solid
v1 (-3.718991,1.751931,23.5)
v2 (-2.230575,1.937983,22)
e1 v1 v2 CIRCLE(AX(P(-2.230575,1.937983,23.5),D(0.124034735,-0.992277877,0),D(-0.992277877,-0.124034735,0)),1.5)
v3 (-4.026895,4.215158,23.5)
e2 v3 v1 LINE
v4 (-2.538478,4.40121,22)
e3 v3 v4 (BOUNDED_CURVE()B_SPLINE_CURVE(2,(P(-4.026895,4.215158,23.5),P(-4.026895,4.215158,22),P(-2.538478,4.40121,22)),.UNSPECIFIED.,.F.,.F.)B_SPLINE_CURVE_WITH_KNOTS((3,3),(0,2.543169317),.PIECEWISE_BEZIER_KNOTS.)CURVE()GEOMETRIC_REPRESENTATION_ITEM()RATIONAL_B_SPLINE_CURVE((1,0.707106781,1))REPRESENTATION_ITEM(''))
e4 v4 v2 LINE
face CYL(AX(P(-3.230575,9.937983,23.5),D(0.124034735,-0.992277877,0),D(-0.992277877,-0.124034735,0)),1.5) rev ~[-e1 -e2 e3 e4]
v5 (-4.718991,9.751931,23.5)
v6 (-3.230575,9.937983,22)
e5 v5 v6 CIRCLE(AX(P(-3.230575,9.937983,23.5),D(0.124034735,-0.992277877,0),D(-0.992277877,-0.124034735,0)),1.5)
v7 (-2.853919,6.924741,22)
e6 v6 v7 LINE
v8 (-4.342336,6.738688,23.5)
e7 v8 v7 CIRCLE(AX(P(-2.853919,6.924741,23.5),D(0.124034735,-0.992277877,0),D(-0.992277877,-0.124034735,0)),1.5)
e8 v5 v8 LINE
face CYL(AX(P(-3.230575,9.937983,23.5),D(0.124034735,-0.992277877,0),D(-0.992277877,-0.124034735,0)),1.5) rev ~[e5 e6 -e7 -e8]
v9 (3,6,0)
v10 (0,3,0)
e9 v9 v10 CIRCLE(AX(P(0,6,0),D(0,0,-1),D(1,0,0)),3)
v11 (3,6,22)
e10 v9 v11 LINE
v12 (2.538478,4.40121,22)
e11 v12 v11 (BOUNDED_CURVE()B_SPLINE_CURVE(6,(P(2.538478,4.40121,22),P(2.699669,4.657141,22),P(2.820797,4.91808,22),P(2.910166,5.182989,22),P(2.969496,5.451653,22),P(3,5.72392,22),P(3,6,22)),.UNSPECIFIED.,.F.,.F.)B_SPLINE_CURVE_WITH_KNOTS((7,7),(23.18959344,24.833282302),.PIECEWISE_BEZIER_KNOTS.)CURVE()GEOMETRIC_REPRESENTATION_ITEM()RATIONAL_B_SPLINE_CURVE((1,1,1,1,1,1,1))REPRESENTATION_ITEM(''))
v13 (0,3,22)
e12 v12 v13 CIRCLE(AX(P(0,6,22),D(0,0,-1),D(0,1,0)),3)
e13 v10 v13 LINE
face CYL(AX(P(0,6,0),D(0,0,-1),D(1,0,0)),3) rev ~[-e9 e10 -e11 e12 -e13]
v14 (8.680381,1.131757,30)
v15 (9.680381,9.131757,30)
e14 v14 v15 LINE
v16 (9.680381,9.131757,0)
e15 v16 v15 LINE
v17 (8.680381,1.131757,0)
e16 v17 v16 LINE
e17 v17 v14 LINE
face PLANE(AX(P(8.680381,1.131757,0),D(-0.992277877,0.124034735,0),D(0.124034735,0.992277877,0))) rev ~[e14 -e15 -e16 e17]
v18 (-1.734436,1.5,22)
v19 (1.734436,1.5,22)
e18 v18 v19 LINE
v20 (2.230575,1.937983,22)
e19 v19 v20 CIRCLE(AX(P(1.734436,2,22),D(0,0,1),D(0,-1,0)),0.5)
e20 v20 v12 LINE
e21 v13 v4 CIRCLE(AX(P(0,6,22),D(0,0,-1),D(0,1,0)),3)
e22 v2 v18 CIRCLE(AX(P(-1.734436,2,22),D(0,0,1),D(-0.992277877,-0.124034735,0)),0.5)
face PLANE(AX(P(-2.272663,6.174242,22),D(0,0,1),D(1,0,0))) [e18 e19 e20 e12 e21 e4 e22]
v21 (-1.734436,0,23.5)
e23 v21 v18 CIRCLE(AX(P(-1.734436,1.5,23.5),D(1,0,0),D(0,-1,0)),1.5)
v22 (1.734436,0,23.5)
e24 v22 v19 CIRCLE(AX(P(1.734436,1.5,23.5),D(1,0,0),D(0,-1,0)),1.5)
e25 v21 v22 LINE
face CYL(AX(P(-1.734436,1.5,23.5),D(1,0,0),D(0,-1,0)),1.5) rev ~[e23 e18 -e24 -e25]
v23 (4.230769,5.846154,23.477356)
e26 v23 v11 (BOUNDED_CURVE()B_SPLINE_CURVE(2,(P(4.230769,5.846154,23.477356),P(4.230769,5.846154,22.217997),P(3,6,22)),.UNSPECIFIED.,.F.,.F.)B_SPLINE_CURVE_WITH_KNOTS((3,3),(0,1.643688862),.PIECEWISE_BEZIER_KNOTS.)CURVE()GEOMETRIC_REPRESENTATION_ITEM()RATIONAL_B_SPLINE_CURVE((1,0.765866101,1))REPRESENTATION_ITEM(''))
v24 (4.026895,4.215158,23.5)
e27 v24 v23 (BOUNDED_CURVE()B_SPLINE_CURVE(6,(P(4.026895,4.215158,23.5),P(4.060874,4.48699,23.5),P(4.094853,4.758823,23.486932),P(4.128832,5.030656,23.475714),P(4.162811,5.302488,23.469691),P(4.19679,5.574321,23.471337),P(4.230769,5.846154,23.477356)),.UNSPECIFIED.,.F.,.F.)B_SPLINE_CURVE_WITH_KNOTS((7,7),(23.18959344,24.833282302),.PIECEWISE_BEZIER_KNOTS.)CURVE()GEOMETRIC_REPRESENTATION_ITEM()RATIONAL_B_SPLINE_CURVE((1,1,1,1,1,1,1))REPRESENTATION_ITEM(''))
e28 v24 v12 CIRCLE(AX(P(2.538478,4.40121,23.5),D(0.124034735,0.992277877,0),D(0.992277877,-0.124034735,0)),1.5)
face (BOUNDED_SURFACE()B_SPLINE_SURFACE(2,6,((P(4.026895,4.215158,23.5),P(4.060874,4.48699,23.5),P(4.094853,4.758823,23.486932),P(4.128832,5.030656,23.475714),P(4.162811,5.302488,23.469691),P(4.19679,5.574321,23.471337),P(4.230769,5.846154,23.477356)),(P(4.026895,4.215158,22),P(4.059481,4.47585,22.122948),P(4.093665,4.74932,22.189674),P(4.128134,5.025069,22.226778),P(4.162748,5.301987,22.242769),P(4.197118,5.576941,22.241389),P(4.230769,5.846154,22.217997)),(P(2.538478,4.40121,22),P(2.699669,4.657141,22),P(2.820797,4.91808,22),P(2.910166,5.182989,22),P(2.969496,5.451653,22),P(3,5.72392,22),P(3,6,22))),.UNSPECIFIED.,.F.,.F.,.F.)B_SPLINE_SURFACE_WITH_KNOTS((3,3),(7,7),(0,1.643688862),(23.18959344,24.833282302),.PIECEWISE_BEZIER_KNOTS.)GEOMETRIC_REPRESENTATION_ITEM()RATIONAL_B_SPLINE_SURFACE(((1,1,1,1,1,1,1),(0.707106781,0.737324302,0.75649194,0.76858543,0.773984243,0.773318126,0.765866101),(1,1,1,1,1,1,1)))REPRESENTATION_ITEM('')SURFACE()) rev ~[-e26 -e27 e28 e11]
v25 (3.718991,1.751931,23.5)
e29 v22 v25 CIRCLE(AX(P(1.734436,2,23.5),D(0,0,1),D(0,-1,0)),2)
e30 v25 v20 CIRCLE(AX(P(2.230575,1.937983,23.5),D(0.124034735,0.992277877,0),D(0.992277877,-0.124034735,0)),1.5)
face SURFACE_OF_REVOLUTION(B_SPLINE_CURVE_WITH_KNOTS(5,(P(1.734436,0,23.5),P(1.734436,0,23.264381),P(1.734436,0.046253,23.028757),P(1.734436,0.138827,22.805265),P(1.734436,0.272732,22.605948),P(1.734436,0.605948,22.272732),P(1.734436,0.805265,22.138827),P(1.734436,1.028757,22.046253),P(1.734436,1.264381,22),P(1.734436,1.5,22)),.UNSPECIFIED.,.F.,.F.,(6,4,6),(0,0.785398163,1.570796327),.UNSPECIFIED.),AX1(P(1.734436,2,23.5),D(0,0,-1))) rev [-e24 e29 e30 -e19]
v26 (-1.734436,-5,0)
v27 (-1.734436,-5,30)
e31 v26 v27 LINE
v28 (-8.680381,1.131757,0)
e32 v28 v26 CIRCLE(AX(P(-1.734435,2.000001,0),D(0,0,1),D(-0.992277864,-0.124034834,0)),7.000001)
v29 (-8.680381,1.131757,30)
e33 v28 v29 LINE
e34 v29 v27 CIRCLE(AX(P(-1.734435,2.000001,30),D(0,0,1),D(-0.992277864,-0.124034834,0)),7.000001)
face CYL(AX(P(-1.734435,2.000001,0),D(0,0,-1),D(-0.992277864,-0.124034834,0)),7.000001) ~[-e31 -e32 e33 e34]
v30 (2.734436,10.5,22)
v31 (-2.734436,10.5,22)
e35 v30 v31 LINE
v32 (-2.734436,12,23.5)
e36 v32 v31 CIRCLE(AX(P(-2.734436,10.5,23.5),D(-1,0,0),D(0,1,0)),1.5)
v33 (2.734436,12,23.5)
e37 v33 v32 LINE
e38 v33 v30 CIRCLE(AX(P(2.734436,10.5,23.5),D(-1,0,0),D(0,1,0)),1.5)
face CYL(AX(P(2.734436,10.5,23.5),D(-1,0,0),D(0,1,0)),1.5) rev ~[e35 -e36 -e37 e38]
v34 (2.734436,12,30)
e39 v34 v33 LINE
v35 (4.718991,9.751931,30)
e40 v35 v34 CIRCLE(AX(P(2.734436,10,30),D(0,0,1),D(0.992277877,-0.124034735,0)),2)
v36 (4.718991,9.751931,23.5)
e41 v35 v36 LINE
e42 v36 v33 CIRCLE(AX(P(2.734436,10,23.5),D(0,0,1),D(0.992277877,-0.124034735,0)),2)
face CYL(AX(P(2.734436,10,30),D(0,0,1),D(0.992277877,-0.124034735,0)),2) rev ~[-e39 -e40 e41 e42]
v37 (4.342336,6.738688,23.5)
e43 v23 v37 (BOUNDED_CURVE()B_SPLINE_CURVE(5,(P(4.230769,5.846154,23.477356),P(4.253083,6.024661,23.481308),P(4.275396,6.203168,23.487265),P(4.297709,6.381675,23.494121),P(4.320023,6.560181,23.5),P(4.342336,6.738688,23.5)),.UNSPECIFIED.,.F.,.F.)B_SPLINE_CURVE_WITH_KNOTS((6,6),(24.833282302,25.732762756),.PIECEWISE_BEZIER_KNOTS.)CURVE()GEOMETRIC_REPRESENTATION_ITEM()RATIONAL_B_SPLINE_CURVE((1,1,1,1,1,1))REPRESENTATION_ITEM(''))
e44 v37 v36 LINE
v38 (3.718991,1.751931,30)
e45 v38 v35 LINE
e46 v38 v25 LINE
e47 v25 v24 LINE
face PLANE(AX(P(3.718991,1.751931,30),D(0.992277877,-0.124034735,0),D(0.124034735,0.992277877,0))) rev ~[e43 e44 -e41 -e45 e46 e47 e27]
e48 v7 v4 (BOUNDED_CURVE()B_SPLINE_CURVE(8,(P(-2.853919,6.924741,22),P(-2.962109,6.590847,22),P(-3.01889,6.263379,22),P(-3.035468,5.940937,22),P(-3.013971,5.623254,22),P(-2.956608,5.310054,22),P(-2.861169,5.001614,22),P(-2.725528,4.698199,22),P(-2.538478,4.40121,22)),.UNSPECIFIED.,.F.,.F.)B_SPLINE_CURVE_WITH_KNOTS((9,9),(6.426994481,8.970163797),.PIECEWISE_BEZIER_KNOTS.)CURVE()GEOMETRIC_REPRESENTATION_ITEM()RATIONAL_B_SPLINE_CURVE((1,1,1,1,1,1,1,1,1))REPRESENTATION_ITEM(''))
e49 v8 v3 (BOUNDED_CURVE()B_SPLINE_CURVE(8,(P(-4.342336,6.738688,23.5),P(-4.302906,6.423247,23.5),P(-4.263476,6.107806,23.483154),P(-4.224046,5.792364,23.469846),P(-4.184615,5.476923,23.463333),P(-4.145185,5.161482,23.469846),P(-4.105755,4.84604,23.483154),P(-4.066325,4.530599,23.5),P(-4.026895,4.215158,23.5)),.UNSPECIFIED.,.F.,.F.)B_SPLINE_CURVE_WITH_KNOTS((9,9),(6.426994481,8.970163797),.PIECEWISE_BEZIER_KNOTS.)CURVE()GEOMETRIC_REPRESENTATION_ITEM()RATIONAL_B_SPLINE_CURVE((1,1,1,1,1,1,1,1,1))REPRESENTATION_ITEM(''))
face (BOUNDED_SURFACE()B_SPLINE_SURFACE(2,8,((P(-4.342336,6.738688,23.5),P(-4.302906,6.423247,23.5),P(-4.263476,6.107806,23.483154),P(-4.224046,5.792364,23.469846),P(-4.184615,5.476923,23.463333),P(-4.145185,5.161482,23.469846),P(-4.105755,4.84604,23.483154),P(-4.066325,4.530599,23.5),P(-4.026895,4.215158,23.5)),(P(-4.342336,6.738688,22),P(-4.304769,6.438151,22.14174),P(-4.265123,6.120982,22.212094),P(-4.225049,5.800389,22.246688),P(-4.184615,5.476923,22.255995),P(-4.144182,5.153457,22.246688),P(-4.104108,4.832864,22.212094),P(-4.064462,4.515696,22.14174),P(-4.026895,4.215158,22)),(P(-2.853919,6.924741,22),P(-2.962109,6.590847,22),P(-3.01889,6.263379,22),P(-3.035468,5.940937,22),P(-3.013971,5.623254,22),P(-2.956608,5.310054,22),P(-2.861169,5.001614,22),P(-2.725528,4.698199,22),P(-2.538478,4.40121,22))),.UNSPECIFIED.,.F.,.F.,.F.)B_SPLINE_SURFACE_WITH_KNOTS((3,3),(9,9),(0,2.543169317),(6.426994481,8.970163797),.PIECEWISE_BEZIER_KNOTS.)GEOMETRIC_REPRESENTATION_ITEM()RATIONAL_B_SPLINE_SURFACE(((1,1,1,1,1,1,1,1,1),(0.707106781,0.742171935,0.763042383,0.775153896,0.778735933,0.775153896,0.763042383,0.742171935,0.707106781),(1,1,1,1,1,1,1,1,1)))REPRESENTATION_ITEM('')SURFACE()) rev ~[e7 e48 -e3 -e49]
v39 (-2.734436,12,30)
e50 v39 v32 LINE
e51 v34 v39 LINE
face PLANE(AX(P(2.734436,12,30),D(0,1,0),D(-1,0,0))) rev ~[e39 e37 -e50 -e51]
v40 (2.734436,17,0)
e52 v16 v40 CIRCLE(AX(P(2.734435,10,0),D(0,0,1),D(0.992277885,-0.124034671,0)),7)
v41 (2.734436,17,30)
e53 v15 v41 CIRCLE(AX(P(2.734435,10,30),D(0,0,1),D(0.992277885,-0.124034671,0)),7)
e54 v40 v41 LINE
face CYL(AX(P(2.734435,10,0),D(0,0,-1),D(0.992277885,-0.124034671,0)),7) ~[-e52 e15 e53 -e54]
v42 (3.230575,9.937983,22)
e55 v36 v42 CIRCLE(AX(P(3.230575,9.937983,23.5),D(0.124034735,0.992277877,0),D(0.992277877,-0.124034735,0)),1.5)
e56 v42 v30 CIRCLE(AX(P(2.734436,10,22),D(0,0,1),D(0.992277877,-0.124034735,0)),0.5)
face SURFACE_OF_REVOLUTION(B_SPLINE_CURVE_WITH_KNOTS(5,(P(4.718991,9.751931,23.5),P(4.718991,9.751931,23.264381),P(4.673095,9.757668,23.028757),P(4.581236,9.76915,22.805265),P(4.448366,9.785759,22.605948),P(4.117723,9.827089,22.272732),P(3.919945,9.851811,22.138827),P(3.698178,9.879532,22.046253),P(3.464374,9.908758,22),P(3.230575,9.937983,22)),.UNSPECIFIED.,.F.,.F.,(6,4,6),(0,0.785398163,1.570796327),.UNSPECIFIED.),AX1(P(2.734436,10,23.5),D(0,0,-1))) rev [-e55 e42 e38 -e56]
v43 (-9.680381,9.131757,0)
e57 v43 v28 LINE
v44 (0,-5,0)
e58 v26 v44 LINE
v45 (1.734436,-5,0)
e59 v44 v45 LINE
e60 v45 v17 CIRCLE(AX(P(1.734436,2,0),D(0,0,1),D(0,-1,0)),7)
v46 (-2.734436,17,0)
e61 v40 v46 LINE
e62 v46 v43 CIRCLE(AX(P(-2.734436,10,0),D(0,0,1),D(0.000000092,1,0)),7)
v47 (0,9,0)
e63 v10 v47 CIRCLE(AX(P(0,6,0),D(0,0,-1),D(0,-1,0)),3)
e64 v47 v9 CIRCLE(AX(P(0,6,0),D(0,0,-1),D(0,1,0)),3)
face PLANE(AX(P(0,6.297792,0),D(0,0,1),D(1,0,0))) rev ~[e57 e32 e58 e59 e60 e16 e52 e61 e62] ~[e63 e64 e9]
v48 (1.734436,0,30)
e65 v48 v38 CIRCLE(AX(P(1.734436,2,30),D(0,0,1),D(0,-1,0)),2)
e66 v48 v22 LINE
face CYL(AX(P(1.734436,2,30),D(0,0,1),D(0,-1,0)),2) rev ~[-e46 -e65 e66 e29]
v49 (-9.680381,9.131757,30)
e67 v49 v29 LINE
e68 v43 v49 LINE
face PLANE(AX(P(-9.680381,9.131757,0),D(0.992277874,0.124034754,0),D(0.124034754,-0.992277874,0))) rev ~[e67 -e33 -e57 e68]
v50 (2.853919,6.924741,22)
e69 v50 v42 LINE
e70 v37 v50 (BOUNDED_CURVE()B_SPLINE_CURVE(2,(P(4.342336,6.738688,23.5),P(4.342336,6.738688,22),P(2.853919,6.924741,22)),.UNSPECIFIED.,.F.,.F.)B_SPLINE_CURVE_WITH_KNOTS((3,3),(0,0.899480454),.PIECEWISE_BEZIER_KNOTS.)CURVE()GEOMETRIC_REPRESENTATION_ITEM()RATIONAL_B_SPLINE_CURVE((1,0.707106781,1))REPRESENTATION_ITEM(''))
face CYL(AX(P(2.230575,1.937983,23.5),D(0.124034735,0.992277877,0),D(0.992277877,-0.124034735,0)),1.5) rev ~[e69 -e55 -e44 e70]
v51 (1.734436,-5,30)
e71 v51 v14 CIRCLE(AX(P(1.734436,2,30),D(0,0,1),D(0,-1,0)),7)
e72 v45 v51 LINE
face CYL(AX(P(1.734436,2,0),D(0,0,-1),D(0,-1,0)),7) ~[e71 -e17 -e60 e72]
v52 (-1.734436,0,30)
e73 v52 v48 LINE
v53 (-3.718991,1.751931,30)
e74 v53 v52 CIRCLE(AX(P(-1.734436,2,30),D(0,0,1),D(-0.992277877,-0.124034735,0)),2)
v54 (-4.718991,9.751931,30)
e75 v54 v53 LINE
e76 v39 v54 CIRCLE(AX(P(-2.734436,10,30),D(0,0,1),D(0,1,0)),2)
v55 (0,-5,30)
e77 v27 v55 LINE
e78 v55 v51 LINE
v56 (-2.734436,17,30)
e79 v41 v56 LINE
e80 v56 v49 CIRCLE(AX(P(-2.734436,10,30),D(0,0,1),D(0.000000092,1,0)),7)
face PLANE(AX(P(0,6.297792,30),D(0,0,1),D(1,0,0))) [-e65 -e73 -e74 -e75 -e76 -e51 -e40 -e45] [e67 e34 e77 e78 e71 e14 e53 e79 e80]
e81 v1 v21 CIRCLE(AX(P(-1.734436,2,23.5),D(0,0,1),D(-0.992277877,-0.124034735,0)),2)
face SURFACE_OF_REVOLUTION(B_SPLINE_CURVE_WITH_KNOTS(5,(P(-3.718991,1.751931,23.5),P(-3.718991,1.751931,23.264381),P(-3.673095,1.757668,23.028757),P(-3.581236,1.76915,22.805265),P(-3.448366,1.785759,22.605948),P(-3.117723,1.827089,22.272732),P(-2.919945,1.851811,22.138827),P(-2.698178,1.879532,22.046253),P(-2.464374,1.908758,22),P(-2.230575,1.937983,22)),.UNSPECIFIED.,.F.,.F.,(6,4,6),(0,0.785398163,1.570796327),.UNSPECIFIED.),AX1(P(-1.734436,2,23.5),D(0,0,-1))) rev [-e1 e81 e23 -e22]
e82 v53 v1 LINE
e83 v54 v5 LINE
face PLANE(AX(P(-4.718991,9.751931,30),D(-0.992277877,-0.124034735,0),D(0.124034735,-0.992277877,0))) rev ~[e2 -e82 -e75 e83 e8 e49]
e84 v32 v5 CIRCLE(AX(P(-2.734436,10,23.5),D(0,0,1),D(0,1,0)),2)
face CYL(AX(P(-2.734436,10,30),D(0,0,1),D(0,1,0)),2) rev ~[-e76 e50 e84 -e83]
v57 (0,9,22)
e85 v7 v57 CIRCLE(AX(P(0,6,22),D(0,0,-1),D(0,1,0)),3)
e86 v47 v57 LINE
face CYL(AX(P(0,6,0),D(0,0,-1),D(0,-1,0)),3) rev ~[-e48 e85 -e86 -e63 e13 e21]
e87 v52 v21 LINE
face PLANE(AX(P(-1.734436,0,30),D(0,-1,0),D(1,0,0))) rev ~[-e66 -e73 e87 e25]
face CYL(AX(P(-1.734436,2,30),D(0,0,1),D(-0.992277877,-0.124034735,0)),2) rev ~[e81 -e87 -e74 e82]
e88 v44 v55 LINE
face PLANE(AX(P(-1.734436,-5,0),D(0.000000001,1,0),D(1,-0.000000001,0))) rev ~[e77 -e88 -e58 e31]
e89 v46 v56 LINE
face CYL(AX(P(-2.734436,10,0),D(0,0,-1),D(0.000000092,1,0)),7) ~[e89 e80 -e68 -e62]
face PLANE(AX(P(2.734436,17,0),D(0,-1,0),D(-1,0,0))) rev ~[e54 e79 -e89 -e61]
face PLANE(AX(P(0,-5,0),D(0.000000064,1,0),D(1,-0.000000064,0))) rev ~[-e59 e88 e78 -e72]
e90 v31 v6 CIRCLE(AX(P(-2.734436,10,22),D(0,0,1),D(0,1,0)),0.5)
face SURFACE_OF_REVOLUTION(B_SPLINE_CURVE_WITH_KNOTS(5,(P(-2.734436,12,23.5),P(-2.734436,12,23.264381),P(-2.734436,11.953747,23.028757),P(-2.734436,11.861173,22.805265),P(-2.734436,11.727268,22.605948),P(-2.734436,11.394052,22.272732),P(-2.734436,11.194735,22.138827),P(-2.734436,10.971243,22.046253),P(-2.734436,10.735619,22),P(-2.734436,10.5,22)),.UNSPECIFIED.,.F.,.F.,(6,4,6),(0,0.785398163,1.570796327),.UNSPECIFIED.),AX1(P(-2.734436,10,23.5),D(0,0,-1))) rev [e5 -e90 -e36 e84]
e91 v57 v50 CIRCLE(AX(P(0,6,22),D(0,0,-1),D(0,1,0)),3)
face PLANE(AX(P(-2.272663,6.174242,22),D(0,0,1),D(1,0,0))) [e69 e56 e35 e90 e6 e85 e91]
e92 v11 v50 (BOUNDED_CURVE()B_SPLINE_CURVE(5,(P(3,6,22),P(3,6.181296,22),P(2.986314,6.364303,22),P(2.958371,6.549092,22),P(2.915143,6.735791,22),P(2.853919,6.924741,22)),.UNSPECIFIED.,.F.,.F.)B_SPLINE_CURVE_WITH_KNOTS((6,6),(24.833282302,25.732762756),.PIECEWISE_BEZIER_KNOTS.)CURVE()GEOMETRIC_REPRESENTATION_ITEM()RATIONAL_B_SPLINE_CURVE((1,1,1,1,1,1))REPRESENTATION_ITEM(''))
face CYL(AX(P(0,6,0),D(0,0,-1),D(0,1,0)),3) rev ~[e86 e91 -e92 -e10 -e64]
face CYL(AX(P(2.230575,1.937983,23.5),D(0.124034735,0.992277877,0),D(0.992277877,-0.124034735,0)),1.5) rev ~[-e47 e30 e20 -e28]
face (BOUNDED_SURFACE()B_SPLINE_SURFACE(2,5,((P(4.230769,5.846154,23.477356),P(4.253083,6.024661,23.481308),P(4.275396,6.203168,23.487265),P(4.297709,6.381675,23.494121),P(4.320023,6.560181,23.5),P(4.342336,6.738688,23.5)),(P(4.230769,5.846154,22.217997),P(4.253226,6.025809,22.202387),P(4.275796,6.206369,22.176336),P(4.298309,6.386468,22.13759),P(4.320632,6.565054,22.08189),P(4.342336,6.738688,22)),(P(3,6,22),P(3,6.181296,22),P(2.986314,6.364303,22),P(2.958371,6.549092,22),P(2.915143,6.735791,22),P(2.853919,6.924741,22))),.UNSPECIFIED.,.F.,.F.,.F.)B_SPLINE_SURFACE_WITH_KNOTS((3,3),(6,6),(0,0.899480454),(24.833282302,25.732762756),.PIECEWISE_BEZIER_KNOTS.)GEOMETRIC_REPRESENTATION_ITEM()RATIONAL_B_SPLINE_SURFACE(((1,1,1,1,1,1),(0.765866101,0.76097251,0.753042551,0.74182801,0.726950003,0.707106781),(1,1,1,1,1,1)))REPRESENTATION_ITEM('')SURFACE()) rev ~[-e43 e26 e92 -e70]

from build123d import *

# Parameters (mm, degrees)
F3_DEPTH = 30
F4_DEPTH = 8
F5_R     = 1.5


# Not quite as in the source:
# - ends of sketch curves that miss each other by under 0.0002 mm in the source are joined


with BuildPart() as f3:
    # F0 (on Top) → F3 (new body)
    with BuildSketch(Plane.XY):
        with BuildLine():
            Line((2.7344355629, 17), (0, 17))
            Line((0, 17), (-2.7344355629, 17))
            ThreePointArc((-2.7344355629, 17), (-7.9821831045, 14.6326182171), (-9.6803811114, 9.1317568064))
            Line((-9.6803811114, 9.1317568064), (-8.6803809552, 1.131756826))
            ThreePointArc((-8.6803809552, 1.131756826), (-6.3670534302, -3.2477471454), (-1.7344355629, -4.9999998862))
            Line((-1.7344355629, -4.9999998862), (0, -4.9999998882))
            Line((0, -4.9999998882), (1.7344355629, -5))
            ThreePointArc((1.7344355629, -5), (6.3670535056, -3.2477472307), (8.6803806999, 1.1317568579))
            Line((8.6803806999, 1.1317568579), (9.6803806999, 9.1317568579))
            ThreePointArc((9.6803806999, 9.1317568579), (7.9821826424, 14.6326178092), (2.7344355629, 17))
        make_face()
        with BuildLine():
            Line((1.7344355629, 0), (0, 0))
            Line((0, 0), (-1.7344355629, 0))
            ThreePointArc((-1.7344355629, 0), (-3.0580406894, 0.5006436484), (-3.7189913164, 1.7519305308))
            Line((-3.7189913164, 1.7519305308), (-4.7189913164, 9.7519305308))
            ThreePointArc((-4.7189913164, 9.7519305308), (-4.2337919146, 11.3236051265), (-2.7344355629, 12))
            Line((-2.7344355629, 12), (0, 12))
            Line((0, 12), (2.7344355629, 12))
            ThreePointArc((2.7344355629, 12), (4.2337919146, 11.3236051265), (4.7189913164, 9.7519305308))
            Line((4.7189913164, 9.7519305308), (3.7189913164, 1.7519305308))
            ThreePointArc((3.7189913164, 1.7519305308), (3.0580406894, 0.5006436484), (1.7344355629, 0))
        make_face(mode=Mode.SUBTRACT)
        with BuildLine():
            Line((-1.7344355629, 0), (0, 0))
            Line((0, 0), (0, 3))
            ThreePointArc((0, 3), (-3, 6), (0, 9))
            Line((0, 9), (0, 12))
            Line((0, 12), (-2.7344355629, 12))
            ThreePointArc((-2.7344355629, 12), (-4.2337919146, 11.3236051265), (-4.7189913164, 9.7519305308))
            Line((-4.7189913164, 9.7519305308), (-3.7189913164, 1.7519305308))
            ThreePointArc((-3.7189913164, 1.7519305308), (-3.0580406894, 0.5006436484), (-1.7344355629, 0))
        make_face()
        with BuildLine():
            Line((0, 3), (0, 0))
            Line((0, 0), (1.7344355629, 0))
            ThreePointArc((1.7344355629, 0), (3.0580406894, 0.5006436484), (3.7189913164, 1.7519305308))
            Line((3.7189913164, 1.7519305308), (4.7189913164, 9.7519305308))
            ThreePointArc((4.7189913164, 9.7519305308), (4.2337919146, 11.3236051265), (2.7344355629, 12))
            Line((2.7344355629, 12), (0, 12))
            Line((0, 12), (0, 9))
            ThreePointArc((0, 9), (2.1213203436, 8.1213203436), (3, 6))
            ThreePointArc((3, 6), (2.1213203436, 3.8786796564), (0, 3))
        make_face()
    extrude(amount=F3_DEPTH)

    # F2 (on offset) → F4 (cut)
    with BuildSketch(Plane.XY.offset(30)):
        with BuildLine():
            ThreePointArc((-3.7189913164, 1.7519305308), (-3.0580406894, 0.5006436484), (-1.7344355629, 0))
            Line((-1.7344355629, 0), (0, 0))
            Line((0, 0), (0, 3))
            ThreePointArc((0, 3), (-3, 6), (0, 9))
            Line((0, 9), (0, 12))
            Line((0, 12), (-2.7344355629, 12))
            ThreePointArc((-2.7344355629, 12), (-4.2337919146, 11.3236051265), (-4.7189913164, 9.7519305308))
            Line((-4.7189913164, 9.7519305308), (-3.7189913164, 1.7519305308))
        make_face()
        with BuildLine():
            Line((0, 3), (0, 0))
            Line((0, 0), (1.7344355629, 0))
            ThreePointArc((1.7344355629, 0), (3.0580406894, 0.5006436484), (3.7189913164, 1.7519305308))
            Line((3.7189913164, 1.7519305308), (4.7189913164, 9.7519305308))
            ThreePointArc((4.7189913164, 9.7519305308), (4.2337919146, 11.3236051265), (2.7344355629, 12))
            Line((2.7344355629, 12), (0, 12))
            Line((0, 12), (0, 9))
            ThreePointArc((0, 9), (3, 6), (0, 3))
        make_face()
    extrude(amount=-F4_DEPTH, mode=Mode.SUBTRACT)

    # F5
    f5_edges = [f3.edges().sort_by_distance(p)[0] for p in [
        (-4.233792, 11.323605, 22),
        (-4.218991, 5.751931, 22),
    ]]
    fillet(f5_edges, radius=F5_R)


solid = f3.part
